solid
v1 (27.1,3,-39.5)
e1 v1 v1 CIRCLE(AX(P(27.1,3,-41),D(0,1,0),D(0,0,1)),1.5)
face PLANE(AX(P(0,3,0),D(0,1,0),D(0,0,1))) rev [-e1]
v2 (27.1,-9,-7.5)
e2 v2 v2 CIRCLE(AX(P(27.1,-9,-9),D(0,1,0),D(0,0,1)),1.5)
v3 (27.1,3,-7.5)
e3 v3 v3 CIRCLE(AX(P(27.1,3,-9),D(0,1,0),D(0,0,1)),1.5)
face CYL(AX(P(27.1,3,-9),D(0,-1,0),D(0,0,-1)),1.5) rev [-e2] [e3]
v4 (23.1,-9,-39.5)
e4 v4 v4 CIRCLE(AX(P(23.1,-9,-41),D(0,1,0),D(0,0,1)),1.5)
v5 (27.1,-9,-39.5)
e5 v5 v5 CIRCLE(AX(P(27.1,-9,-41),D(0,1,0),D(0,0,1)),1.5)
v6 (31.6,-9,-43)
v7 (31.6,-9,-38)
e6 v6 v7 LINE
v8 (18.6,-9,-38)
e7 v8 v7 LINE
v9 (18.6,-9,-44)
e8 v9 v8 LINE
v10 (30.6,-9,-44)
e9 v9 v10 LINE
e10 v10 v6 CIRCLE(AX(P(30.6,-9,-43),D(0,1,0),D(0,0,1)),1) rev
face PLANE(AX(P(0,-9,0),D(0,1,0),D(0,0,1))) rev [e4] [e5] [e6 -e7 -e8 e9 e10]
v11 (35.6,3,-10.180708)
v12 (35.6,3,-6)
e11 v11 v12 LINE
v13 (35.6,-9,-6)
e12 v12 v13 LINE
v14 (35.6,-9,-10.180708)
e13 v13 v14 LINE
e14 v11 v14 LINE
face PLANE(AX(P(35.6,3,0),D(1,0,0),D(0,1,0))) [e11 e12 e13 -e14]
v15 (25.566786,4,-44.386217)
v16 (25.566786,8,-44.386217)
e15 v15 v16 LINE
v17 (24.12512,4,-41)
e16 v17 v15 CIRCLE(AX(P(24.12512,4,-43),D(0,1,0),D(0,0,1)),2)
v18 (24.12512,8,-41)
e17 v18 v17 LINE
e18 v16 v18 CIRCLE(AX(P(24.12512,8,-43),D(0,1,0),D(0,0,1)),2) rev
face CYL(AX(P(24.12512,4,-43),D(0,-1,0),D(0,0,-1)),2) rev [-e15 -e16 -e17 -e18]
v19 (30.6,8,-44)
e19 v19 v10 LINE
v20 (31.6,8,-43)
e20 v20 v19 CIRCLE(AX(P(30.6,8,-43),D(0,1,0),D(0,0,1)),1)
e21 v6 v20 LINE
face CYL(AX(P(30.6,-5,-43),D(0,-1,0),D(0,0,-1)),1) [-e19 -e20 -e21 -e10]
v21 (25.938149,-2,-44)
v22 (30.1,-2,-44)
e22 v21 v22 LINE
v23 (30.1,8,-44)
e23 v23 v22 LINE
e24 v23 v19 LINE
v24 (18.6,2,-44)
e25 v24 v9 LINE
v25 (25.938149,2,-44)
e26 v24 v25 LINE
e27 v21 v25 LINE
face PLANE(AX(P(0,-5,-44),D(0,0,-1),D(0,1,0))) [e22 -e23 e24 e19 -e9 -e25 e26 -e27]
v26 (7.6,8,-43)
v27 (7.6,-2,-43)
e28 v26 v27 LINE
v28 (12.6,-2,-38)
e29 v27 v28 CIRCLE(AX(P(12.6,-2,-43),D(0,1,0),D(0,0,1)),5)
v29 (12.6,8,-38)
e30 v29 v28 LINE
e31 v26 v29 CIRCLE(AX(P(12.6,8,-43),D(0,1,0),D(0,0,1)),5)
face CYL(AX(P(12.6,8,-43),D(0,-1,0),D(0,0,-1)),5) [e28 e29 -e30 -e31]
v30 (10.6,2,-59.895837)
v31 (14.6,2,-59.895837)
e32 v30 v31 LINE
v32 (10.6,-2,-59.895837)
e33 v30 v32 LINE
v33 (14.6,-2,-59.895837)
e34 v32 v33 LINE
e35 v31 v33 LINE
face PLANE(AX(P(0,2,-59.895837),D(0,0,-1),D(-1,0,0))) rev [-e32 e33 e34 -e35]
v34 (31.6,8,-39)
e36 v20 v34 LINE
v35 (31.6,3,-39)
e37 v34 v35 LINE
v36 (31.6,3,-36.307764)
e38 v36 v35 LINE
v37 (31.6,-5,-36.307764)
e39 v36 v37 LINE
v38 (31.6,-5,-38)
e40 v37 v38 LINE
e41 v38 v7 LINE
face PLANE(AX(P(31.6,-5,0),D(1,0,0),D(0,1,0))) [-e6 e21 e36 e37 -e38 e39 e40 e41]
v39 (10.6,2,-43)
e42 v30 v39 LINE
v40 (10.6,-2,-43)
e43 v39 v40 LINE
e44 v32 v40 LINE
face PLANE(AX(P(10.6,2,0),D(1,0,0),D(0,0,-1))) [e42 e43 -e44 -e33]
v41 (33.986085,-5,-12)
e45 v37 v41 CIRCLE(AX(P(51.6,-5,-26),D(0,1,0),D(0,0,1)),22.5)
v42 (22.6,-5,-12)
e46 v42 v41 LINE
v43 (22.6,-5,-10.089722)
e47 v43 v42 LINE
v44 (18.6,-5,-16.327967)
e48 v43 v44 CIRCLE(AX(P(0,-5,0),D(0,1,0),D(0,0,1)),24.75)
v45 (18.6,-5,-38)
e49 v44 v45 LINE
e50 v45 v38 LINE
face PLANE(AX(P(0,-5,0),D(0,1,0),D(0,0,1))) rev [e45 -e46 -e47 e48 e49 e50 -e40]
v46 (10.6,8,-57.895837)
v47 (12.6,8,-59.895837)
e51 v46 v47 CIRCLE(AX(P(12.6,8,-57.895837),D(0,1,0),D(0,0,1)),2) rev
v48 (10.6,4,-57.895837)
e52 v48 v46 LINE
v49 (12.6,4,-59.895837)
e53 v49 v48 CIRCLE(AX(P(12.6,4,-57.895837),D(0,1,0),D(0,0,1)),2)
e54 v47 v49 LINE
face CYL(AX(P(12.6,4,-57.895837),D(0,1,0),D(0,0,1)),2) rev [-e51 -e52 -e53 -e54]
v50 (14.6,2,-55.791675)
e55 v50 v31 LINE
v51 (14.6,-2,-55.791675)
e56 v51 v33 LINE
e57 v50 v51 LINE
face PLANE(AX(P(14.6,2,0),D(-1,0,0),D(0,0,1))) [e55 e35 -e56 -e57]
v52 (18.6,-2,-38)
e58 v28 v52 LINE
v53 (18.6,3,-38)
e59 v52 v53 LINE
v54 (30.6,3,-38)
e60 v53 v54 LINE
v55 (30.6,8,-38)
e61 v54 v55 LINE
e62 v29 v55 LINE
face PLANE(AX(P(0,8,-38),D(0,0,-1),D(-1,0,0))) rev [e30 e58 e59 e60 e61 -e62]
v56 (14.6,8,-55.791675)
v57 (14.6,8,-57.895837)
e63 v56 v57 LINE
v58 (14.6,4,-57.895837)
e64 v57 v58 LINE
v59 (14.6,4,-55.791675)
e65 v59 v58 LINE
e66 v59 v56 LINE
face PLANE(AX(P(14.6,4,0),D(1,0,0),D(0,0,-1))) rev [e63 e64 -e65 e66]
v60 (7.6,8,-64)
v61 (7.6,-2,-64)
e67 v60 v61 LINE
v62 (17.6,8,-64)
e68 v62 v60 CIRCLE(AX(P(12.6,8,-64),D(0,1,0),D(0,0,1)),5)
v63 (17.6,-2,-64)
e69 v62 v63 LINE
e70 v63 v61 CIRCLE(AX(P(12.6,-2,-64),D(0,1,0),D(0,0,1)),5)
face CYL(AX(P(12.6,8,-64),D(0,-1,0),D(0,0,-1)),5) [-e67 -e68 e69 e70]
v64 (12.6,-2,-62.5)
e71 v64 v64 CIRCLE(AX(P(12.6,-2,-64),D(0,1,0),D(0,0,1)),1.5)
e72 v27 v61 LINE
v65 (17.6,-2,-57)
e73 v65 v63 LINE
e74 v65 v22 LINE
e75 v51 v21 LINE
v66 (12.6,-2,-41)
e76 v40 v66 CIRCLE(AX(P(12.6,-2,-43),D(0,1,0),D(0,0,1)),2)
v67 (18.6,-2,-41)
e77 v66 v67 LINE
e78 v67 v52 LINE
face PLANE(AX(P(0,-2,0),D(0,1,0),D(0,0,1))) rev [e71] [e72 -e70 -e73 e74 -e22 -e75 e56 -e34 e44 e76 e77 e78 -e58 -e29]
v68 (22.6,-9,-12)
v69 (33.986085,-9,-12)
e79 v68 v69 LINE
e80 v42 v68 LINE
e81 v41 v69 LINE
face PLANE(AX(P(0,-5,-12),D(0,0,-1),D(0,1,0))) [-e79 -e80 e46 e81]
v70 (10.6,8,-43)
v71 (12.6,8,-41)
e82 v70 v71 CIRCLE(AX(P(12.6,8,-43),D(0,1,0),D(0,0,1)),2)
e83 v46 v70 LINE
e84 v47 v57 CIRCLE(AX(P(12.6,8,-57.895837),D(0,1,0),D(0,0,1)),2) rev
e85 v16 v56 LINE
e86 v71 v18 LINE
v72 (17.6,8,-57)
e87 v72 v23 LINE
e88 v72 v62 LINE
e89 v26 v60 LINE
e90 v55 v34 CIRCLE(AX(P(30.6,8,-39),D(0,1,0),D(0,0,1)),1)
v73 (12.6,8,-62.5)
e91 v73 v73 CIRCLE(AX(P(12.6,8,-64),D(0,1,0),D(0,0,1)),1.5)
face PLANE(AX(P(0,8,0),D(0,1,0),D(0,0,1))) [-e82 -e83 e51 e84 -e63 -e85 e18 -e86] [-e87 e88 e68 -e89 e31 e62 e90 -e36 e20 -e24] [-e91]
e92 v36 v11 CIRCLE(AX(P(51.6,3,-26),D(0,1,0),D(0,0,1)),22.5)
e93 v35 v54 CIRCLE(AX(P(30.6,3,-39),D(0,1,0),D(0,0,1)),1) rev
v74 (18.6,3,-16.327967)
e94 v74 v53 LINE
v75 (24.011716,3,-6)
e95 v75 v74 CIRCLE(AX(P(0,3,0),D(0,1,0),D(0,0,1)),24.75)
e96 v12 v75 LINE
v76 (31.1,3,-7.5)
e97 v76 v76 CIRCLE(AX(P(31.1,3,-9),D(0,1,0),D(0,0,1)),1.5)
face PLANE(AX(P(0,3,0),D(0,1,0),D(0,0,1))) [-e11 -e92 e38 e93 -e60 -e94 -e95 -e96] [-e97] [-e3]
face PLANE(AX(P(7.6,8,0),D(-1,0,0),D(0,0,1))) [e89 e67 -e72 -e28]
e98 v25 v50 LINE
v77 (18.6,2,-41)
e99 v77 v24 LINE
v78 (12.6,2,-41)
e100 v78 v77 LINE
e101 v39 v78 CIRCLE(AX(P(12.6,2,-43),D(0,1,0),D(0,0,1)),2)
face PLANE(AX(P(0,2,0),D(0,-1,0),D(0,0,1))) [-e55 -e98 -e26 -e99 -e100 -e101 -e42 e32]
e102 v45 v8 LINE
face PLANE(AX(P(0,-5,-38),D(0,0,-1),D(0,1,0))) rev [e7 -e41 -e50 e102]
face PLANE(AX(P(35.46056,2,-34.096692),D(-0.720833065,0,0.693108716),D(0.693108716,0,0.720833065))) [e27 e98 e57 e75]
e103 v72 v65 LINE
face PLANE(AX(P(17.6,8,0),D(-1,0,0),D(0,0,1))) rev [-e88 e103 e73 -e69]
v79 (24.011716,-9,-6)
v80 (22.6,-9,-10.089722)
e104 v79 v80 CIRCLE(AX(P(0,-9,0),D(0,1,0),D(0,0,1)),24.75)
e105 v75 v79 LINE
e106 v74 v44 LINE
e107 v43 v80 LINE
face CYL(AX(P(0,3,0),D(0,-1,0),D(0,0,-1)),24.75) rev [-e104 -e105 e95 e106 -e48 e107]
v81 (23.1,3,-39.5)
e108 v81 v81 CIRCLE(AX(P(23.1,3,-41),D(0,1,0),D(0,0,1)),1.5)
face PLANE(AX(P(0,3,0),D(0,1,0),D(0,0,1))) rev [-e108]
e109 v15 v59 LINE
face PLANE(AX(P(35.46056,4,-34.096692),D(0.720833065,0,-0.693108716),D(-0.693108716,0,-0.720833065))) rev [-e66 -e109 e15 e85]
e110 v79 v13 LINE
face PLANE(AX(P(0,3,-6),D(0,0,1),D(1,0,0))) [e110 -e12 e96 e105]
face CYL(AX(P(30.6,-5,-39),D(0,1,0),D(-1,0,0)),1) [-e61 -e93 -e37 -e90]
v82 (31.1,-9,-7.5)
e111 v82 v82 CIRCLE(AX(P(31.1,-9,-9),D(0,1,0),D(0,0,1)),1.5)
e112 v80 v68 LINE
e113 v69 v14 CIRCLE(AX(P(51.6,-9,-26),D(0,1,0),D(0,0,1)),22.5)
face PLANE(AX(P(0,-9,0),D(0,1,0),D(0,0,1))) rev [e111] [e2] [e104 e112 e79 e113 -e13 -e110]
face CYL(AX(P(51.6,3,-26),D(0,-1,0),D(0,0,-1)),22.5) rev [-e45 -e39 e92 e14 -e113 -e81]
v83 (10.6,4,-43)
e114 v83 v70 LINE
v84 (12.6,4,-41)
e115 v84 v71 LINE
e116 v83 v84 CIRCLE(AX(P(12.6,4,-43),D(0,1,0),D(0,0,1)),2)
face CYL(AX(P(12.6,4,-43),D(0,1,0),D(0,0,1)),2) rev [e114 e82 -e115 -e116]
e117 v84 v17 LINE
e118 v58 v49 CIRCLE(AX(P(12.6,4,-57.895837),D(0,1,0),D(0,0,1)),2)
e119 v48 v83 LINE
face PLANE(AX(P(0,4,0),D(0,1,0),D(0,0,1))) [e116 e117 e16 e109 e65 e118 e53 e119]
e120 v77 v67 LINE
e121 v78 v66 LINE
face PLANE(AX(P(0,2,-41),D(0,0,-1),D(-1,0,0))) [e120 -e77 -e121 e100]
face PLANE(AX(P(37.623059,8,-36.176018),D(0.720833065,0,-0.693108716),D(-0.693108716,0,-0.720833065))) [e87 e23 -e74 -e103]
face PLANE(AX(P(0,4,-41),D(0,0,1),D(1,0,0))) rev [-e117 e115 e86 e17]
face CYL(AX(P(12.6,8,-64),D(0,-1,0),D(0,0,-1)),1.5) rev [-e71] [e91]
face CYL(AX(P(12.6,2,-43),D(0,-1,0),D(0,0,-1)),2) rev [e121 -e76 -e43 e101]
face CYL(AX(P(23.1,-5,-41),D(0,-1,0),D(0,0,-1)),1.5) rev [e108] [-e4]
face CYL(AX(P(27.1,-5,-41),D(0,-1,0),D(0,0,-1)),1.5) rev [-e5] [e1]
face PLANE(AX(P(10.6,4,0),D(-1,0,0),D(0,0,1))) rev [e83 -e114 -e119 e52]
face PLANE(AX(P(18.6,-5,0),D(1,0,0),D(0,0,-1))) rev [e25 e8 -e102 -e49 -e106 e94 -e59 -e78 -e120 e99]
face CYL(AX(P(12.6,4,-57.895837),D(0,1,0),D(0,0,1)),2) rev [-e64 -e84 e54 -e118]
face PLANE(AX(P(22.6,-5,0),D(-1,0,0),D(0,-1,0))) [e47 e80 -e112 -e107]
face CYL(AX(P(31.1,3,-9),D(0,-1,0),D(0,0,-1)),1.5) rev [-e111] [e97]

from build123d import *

# Parameters (mm, degrees)
SKETCH1_W             = 13
SKETCH1_H             = 6
SKETCH1_R             = 1.5
BOSS_EXTRUDE1_DEPTH   = 4
BOSS_EXTRUDE1_2_DEPTH = 4
BOSS_EXTRUDE2_START   = 4
SKETCH1_4_R           = 1.5
SKETCH1_4_W           = 13
SKETCH1_4_H           = 6
BOSS_EXTRUDE2_DEPTH   = 8
SKETCH2_R             = 1.5
BOSS_EXTRUDE3_DEPTH   = 5
BOSS_EXTRUDE4_START   = -5
SKETCH2_3_R           = 1.5
BOSS_EXTRUDE4_DEPTH   = 5
CUT_EXTRUDE1_DEPTH    = 4
FILLET1_R             = 1
FILLET2_R             = 1
FILLET3_R             = 2
BOSS_EXTRUDE5_START   = 11
SKETCH4_R             = 1.5
BOSS_EXTRUDE5_DEPTH   = 11


with BuildPart() as part:
    # Sketch1 → Boss-Extrude1 (new body)
    with BuildSketch(Plane(origin=(0, -9, 0), x_dir=(1, 0, 0), z_dir=(0, 1, 0))):
        with Locations((25.1, 41)):
            Rectangle(SKETCH1_W, SKETCH1_H)
        with Locations(Location((27.1, 41, 0), (0, 0, 270))):
            Circle(SKETCH1_R, mode=Mode.SUBTRACT)
        with Locations(Location((23.1, 41, 0), (0, 0, 270))):
            Circle(SKETCH1_R, mode=Mode.SUBTRACT)
    extrude(amount=BOSS_EXTRUDE1_DEPTH)



with BuildPart() as body_2:
    # Sketch1 → Boss-Extrude1 2 (new body)
    with BuildSketch(Plane(origin=(0, -9, 0), x_dir=(1, 0, 0), z_dir=(0, 1, 0))):
        with BuildLine():
            ThreePointArc((22.6, 10.089722494), (23.395394249, 8.075767946), (24.01171589, 6))
            Line((24.01171589, 6), (35.6, 6))
            Line((35.6, 6), (35.6, 10.18070798))
            ThreePointArc((35.6, 10.18070798), (34.768444056, 11.068532406), (33.986085046, 12))
            Line((33.986085046, 12), (31.6, 12))
            Line((31.6, 12), (22.6, 12))
            Line((22.6, 12), (22.6, 10.089722494))
        make_face()
        with Locations(Location((27.1, 9, 0), (0, 0, 270))):
            Circle(SKETCH1_R, mode=Mode.SUBTRACT)
        with Locations(Location((31.1, 9, 0), (0, 0, 270))):
            Circle(SKETCH1_R, mode=Mode.SUBTRACT)
    extrude(amount=BOSS_EXTRUDE1_2_DEPTH)


with BuildPart() as part_1:
    add(part.part)

    add(body_2.part)  # Boss-Extrude2 merges body 2
    # Sketch1<4> → Boss-Extrude2 (add)
    # profile 1 of 5: a face of its own
    with BuildSketch(Plane(origin=(0, -9, 0), x_dir=(1, 0, 0), z_dir=(0, 1, 0)).offset(BOSS_EXTRUDE2_START)):
        with BuildLine():
            ThreePointArc((22.6, 10.089722494), (23.395394249, 8.075767946), (24.01171589, 6))
            Line((24.01171589, 6), (35.6, 6))
            Line((35.6, 6), (35.6, 10.18070798))
            ThreePointArc((35.6, 10.18070798), (34.768444056, 11.068532406), (33.986085046, 12))
            Line((33.986085046, 12), (31.6, 12))
            Line((31.6, 12), (22.6, 12))
            Line((22.6, 12), (22.6, 10.089722494))
        make_face()
        with Locations(Location((27.1, 9, 0), (0, 0, 270))):
            Circle(SKETCH1_4_R, mode=Mode.SUBTRACT)
        with Locations(Location((31.1, 9, 0), (0, 0, 270))):
            Circle(SKETCH1_4_R, mode=Mode.SUBTRACT)
    # profile 2 of 5: a face of its own
    with BuildSketch(Plane(origin=(0, -9, 0), x_dir=(1, 0, 0), z_dir=(0, 1, 0)).offset(BOSS_EXTRUDE2_START)):
        with BuildLine():
            Line((21.646304534, 12), (22.6, 12))
            Line((22.6, 12), (31.6, 12))
            Line((31.6, 12), (31.6, 15.692235936))
            ThreePointArc((31.6, 15.692235936), (29.1, 26), (31.6, 36.307764064))
            Line((31.6, 36.307764064), (31.6, 38))
            Line((31.6, 38), (18.6, 38))
            Line((18.6, 38), (18.6, 16.327966805))
            ThreePointArc((18.6, 16.327966805), (20.239171953, 14.245645604), (21.646304534, 12))
        make_face()
    # profile 3 of 5: a face of its own
    with BuildSketch(Plane(origin=(0, -9, 0), x_dir=(1, 0, 0), z_dir=(0, 1, 0)).offset(BOSS_EXTRUDE2_START)):
        with BuildLine():
            Line((31.6, 15.692235936), (31.6, 12))
            Line((31.6, 12), (33.986085046, 12))
            ThreePointArc((33.986085046, 12), (32.702650951, 13.787702963), (31.6, 15.692235936))
        make_face()
    # profile 4 of 5: a face of its own
    with BuildSketch(Plane(origin=(0, -9, 0), x_dir=(1, 0, 0), z_dir=(0, 1, 0)).offset(BOSS_EXTRUDE2_START)):
        with BuildLine():
            ThreePointArc((21.646304534, 12), (22.143761114, 11.055150099), (22.6, 10.089722494))
            Line((22.6, 10.089722494), (22.6, 12))
            Line((22.6, 12), (21.646304534, 12))
        make_face()
    # profile 5 of 5: a face of its own
    with BuildSketch(Plane(origin=(0, -9, 0), x_dir=(1, 0, 0), z_dir=(0, 1, 0)).offset(BOSS_EXTRUDE2_START)):
        with Locations((25.1, 41)):
            Rectangle(SKETCH1_4_W, SKETCH1_4_H)
        with Locations(Location((27.1, 41, 0), (0, 0, 270))):
            Circle(SKETCH1_4_R, mode=Mode.SUBTRACT)
        with Locations(Location((23.1, 41, 0), (0, 0, 270))):
            Circle(SKETCH1_4_R, mode=Mode.SUBTRACT)
    extrude(amount=BOSS_EXTRUDE2_DEPTH)

    # Sketch2 → Boss-Extrude3 (add)
    with BuildSketch(Plane(origin=(0, 3, 0), x_dir=(1, 0, 0), z_dir=(0, 1, 0))):
        with BuildLine():
            Line((31.6, 38), (31.6, 44))
            Line((31.6, 44), (30.1, 44))
            Line((30.1, 44), (17.6, 57))
            Line((17.6, 57), (17.6, 64))
            ThreePointArc((17.6, 64), (12.6, 69), (7.6, 64))
            Line((7.6, 64), (7.6, 43))
            ThreePointArc((7.6, 43), (9.064466094, 39.464466094), (12.6, 38))
            Line((12.6, 38), (31.6, 38))
        make_face()
        with Locations(Location((12.6, 64, 0), (0, 0, 270))):
            Circle(SKETCH2_R, mode=Mode.SUBTRACT)
    extrude(amount=BOSS_EXTRUDE3_DEPTH)

    # Sketch2<3> → Boss-Extrude4 (add)
    with BuildSketch(Plane(origin=(0, 3, 0), x_dir=(1, 0, 0), z_dir=(0, 1, 0)).offset(BOSS_EXTRUDE4_START)):
        with BuildLine():
            Line((18.6, 38), (18.6, 44))
            Line((18.6, 44), (30.1, 44))
            Line((30.1, 44), (17.6, 57))
            Line((17.6, 57), (17.6, 64))
            ThreePointArc((17.6, 64), (12.6, 69), (7.6, 64))
            Line((7.6, 64), (7.6, 43))
            ThreePointArc((7.6, 43), (9.064466094, 39.464466094), (12.6, 38))
            Line((12.6, 38), (18.6, 38))
        make_face()
        with Locations(Location((12.6, 64, 0), (0, 0, 270))):
            Circle(SKETCH2_3_R, mode=Mode.SUBTRACT)
    extrude(amount=BOSS_EXTRUDE4_DEPTH)

    # Sketch3 → Cut-Extrude1 (cut)
    with BuildSketch(Plane(origin=(0, 8, 0), x_dir=(1, 0, 0), z_dir=(0, 1, 0))):
        with BuildLine():
            Line((10.6, 59.895837344), (14.6, 59.895837344))
            Line((14.6, 59.895837344), (14.6, 55.791674689))
            Line((14.6, 55.791674689), (28.822764124, 41))
            Line((28.822764124, 41), (12.6, 41))
            ThreePointArc((12.6, 41), (11.185786438, 41.585786438), (10.6, 43))
            Line((10.6, 43), (10.6, 59.895837344))
        make_face()
    cut_extrude1 = extrude(amount=-CUT_EXTRUDE1_DEPTH, mode=Mode.SUBTRACT)

    # Fillet1
    fillet1_edges = [part_1.edges().sort_by_distance(p)[0] for p in [
        (31.6, -0.5, -44),
    ]]
    fillet(fillet1_edges, radius=FILLET1_R)

    # Fillet2
    fillet2_edges = [part_1.edges().sort_by_distance(p)[0] for p in [
        (31.6, 5.5, -38),
    ]]
    fillet(fillet2_edges, radius=FILLET2_R)

    # Fillet3
    fillet3_edges = [part_1.edges().sort_by_distance(p)[0] for p in [
        (14.6, 6, -59.895837344),
        (10.6, 6, -59.895837344),
        (28.822764124, 6, -41),
    ]]
    fillet(fillet3_edges, radius=FILLET3_R - 0.0001)  # a hair under: the kernel refuses the full size

    # Mirror2: Cut-Extrude1 across plane
    add(cut_extrude1.mirror(Plane.ZX.offset(3)), mode=Mode.SUBTRACT)

    # Sketch4 → Boss-Extrude5 (add)
    with BuildSketch(Plane.XZ.offset(-2).offset(BOSS_EXTRUDE5_START)):
        with BuildLine():
            Line((18.6, -44), (30.6, -44))
            ThreePointArc((30.6, -44), (31.307106781, -43.707106781), (31.6, -43))
            Line((31.6, -43), (31.6, -38))
            Line((31.6, -38), (18.6, -38))
            Line((18.6, -38), (18.6, -44))
        make_face()
        with Locations(Location((23.1, -41, 0), (0, 0, 90))):
            Circle(SKETCH4_R, mode=Mode.SUBTRACT)
        with Locations(Location((27.1, -41, 0), (0, 0, 90))):
            Circle(SKETCH4_R, mode=Mode.SUBTRACT)
    extrude(amount=-BOSS_EXTRUDE5_DEPTH)


solid = part_1.part
